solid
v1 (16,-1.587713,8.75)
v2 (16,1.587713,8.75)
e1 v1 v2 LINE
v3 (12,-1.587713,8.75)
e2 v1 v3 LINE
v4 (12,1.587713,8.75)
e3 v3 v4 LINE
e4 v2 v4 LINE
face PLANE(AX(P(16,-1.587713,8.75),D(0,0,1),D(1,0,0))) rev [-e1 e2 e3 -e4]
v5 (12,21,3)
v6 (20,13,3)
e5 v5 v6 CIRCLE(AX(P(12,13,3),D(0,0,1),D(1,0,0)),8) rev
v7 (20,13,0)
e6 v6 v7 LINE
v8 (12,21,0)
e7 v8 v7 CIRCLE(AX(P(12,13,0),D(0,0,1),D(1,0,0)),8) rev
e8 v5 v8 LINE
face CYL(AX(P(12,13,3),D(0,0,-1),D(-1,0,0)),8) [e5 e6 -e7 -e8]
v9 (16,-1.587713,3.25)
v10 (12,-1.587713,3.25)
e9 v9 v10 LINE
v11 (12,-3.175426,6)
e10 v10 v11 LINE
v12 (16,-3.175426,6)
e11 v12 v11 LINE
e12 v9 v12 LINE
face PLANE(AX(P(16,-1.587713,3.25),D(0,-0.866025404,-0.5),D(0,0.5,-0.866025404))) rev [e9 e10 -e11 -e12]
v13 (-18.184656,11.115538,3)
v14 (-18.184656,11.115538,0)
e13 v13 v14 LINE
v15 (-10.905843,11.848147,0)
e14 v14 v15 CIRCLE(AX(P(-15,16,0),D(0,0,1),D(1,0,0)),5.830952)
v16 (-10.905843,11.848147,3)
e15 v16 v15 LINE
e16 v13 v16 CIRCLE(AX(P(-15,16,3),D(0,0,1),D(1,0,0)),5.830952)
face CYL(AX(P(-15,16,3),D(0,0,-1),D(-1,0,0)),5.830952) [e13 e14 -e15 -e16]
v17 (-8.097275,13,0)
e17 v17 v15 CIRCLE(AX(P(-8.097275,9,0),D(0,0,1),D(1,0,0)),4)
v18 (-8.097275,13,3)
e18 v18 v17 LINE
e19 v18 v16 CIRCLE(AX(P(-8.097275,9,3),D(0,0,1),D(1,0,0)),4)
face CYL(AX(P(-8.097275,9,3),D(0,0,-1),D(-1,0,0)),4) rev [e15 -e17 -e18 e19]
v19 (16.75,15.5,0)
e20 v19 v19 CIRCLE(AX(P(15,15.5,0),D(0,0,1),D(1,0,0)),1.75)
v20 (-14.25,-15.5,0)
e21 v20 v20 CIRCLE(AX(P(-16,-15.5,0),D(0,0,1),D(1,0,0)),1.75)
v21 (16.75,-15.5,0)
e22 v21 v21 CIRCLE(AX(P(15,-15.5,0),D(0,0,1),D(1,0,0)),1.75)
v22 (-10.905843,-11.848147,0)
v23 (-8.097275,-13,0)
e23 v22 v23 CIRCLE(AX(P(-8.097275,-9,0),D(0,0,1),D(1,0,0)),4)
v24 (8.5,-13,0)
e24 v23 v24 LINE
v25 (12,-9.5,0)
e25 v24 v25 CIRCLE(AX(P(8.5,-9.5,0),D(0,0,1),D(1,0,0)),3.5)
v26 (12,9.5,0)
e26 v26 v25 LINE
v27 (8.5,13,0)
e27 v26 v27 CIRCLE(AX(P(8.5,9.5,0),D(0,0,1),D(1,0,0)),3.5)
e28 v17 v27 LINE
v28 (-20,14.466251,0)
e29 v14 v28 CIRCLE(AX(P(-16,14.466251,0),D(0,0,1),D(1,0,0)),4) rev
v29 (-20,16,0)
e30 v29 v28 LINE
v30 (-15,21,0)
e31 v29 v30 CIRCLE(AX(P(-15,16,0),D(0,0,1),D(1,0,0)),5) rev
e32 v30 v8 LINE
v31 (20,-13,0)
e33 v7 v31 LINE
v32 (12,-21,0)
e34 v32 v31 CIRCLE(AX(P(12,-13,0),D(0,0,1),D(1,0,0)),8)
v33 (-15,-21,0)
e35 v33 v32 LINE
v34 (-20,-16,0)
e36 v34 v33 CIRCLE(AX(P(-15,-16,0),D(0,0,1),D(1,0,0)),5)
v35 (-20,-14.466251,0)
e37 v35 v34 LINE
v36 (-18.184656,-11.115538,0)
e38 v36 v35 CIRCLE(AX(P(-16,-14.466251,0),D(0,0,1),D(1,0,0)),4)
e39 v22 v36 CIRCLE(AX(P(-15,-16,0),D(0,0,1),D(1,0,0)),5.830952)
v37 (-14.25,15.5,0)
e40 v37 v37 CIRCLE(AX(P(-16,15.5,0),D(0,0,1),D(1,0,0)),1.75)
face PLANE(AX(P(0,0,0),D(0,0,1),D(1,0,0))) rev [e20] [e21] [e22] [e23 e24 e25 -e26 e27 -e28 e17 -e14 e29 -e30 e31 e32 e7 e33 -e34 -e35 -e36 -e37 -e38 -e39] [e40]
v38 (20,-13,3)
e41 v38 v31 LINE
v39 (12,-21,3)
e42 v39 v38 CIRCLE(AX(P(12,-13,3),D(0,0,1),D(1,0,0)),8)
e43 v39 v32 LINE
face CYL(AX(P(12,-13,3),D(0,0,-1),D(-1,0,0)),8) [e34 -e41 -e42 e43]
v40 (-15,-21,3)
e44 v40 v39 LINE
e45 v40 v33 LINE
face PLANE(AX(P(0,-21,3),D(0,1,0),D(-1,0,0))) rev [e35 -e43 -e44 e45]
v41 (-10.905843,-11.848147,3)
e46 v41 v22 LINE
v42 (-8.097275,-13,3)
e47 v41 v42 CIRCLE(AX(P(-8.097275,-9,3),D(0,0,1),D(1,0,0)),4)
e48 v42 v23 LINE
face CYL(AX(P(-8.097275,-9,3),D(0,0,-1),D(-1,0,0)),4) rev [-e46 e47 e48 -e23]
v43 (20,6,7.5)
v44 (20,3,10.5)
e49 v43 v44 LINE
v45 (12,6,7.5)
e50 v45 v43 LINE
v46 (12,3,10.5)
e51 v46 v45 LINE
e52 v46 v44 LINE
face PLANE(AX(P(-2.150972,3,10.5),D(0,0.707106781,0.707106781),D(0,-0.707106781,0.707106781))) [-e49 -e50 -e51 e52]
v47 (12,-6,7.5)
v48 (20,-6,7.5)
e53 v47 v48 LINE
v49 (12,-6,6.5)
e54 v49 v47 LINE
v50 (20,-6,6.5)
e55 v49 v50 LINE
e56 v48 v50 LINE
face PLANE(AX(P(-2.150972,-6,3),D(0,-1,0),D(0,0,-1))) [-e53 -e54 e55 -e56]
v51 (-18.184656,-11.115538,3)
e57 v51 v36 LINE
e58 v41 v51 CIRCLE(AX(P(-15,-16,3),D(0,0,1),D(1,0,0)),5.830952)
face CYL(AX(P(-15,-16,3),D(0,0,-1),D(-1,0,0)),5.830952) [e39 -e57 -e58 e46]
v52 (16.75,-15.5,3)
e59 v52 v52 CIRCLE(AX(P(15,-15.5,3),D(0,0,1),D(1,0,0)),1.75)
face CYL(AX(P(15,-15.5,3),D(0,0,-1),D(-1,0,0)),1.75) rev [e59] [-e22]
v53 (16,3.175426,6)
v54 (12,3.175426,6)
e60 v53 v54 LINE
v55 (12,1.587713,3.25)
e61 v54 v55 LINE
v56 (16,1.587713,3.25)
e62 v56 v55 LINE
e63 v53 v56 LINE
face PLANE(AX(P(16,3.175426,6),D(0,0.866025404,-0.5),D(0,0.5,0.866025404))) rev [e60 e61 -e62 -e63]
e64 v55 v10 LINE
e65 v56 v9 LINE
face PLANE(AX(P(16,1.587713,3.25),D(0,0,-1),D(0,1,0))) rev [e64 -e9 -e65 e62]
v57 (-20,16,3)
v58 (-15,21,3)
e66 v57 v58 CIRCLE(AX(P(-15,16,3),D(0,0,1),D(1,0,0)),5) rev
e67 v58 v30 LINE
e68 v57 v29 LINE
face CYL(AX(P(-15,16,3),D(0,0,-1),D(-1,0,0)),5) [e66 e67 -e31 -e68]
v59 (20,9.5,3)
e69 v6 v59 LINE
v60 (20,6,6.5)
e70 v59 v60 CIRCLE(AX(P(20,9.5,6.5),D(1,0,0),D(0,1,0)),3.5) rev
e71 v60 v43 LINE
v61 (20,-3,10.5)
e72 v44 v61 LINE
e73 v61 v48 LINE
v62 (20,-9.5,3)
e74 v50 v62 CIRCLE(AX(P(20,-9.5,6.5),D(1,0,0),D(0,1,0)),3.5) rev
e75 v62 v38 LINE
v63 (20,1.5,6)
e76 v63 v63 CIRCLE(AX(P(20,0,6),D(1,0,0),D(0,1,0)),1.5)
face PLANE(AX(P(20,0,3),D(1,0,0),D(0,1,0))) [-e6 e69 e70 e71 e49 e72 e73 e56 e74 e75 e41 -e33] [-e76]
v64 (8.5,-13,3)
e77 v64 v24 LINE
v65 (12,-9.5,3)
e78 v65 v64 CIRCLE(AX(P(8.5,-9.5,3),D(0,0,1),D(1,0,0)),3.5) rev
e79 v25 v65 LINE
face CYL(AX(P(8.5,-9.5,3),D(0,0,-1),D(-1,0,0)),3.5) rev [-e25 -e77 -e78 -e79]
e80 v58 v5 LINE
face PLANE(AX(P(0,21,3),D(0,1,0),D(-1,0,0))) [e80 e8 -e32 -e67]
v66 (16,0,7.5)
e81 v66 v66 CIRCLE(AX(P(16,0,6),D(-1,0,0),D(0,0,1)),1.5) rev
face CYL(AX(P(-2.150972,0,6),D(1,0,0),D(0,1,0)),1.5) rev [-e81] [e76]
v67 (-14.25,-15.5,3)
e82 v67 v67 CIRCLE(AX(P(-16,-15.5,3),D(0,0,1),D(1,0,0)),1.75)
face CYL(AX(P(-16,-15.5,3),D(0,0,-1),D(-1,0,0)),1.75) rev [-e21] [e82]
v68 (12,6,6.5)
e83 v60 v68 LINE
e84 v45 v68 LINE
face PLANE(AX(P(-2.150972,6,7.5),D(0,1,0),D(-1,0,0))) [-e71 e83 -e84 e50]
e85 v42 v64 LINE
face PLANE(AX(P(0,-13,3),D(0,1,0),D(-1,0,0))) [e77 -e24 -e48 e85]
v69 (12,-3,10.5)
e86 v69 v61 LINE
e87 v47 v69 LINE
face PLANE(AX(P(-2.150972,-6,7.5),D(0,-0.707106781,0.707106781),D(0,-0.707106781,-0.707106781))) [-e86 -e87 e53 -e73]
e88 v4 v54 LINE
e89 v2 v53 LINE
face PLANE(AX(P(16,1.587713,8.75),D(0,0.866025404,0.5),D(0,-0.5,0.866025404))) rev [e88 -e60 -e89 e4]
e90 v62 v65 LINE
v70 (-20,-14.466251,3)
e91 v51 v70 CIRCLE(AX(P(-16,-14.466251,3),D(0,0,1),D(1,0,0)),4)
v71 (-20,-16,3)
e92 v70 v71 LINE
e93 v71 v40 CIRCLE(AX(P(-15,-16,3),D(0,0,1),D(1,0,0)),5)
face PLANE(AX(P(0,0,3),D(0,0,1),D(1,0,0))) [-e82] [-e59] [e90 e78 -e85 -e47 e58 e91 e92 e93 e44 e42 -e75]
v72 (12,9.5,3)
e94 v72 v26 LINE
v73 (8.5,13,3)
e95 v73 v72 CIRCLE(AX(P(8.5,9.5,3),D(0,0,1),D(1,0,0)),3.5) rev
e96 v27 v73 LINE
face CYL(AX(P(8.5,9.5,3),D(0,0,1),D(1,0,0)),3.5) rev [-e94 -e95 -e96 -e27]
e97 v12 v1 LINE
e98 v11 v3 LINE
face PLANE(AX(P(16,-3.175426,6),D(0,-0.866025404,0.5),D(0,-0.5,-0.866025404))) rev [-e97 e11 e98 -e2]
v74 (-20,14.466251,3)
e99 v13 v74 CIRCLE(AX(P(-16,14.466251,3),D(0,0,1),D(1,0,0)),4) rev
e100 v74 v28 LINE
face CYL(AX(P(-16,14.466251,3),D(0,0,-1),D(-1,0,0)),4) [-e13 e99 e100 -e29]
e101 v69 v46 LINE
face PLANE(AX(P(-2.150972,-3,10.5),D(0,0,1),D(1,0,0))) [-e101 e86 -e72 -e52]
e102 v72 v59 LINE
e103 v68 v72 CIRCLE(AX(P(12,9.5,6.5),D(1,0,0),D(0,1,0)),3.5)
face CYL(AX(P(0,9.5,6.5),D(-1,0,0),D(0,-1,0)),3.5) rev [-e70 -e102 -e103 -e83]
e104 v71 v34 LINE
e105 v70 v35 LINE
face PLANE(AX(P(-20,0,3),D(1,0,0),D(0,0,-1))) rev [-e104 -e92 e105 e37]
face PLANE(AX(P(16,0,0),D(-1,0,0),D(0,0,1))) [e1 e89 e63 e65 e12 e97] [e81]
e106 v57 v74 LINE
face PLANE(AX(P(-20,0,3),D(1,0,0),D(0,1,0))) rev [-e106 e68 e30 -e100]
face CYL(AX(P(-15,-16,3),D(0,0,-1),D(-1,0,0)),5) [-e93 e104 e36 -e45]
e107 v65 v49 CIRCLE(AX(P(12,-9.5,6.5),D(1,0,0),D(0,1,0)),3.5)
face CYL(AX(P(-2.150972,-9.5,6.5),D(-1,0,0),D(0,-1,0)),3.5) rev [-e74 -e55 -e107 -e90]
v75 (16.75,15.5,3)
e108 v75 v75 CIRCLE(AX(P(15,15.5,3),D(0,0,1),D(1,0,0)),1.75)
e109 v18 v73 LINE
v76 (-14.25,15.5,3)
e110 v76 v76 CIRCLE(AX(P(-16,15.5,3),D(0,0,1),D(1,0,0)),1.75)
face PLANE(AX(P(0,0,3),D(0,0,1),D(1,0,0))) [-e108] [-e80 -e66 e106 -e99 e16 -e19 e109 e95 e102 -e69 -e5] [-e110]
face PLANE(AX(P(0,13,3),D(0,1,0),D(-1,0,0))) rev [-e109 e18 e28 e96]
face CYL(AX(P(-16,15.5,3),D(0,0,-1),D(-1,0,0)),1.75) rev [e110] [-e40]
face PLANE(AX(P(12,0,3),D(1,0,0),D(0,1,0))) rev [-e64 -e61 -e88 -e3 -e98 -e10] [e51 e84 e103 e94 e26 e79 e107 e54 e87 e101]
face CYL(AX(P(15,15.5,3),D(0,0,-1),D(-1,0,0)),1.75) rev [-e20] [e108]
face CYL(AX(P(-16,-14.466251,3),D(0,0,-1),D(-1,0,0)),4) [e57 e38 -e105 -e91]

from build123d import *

# Parameters (mm, degrees)
SKETCH1_R           = 1.75
BOSS_EXTRUDE1_DEPTH = 3
SKETCH2_R           = 1.5
BOSS_EXTRUDE2_DEPTH = 8
FILLET1_R           = 3.5
CUT_EXTRUDE1_DEPTH  = 4


with BuildPart() as part:
    # Sketch1 → Boss-Extrude1 (new body)
    with BuildSketch(Plane.XY):
        with BuildLine():
            Line((-20, 16), (-20, 14.466251376))
            ThreePointArc((-20, 14.466251376), (-19.517003263, 12.560814931), (-18.184655977, 11.115538278))
            ThreePointArc((-18.184655977, 11.115538278), (-14.41606767, 10.198360315), (-10.905843198, 11.848147392))
            ThreePointArc((-10.905843198, 11.848147392), (-9.615070973, 12.700850549), (-8.097274802, 13))
            Line((-8.097274802, 13), (12, 13))
            Line((12, 13), (12, -13))
            Line((12, -13), (-8.097274802, -13))
            ThreePointArc((-8.097274802, -13), (-9.615070973, -12.700850549), (-10.905843198, -11.848147392))
            ThreePointArc((-10.905843198, -11.848147392), (-14.41606767, -10.198360315), (-18.184655977, -11.115538278))
            ThreePointArc((-18.184655977, -11.115538278), (-19.517003263, -12.560814931), (-20, -14.466251376))
            Line((-20, -14.466251376), (-20, -16))
            ThreePointArc((-20, -16), (-18.535533906, -19.535533906), (-15, -21))
            Line((-15, -21), (12, -21))
            ThreePointArc((12, -21), (17.656854249, -18.656854249), (20, -13))
            Line((20, -13), (20, 13))
            ThreePointArc((20, 13), (17.656854249, 18.656854249), (12, 21))
            Line((12, 21), (-15, 21))
            ThreePointArc((-15, 21), (-18.535533906, 19.535533906), (-20, 16))
        make_face()
        with Locations((15, 15.5)):
            Circle(SKETCH1_R, mode=Mode.SUBTRACT)
        with Locations((15, -15.5)):
            Circle(SKETCH1_R, mode=Mode.SUBTRACT)
        with Locations((-16, -15.5)):
            Circle(SKETCH1_R, mode=Mode.SUBTRACT)
        with Locations((-16, 15.5)):
            Circle(SKETCH1_R, mode=Mode.SUBTRACT)
    extrude(amount=BOSS_EXTRUDE1_DEPTH)

    # Sketch2 → Boss-Extrude2 (add)
    with BuildSketch(Plane(origin=(20, 0, 0), x_dir=(0, 0, -1), z_dir=(1, 0, 0))):
        Polygon((-10.5, 3), (-7.5, 6), (-3, 6), (-3, -6), (-7.5, -6), (-10.5, -3), align=None)
        with Locations(Location((-6, 0, 0), (0, 0, 90))):
            Circle(SKETCH2_R, mode=Mode.SUBTRACT)
    extrude(amount=-BOSS_EXTRUDE2_DEPTH)

    # Fillet1
    fillet1_edges = [part.edges().sort_by_distance(p)[0] for p in [
        (16, 6, 3),
        (16, -6, 3),
        (12, -13, 1.5),
        (12, 13, 1.5),
    ]]
    fillet(fillet1_edges, radius=FILLET1_R - 0.0001)  # a hair under: the kernel refuses the full size

    # Sketch3 → Cut-Extrude1 (cut)
    with BuildSketch(Plane.ZY.offset(-12)):
        Polygon((6, 3.175426481), (3.25, 1.58771324), (3.25, -1.58771324), (6, -3.175426481), (8.75, -1.58771324), (8.75, 1.58771324), align=None)
    extrude(amount=-CUT_EXTRUDE1_DEPTH, mode=Mode.SUBTRACT)


solid = part.part
